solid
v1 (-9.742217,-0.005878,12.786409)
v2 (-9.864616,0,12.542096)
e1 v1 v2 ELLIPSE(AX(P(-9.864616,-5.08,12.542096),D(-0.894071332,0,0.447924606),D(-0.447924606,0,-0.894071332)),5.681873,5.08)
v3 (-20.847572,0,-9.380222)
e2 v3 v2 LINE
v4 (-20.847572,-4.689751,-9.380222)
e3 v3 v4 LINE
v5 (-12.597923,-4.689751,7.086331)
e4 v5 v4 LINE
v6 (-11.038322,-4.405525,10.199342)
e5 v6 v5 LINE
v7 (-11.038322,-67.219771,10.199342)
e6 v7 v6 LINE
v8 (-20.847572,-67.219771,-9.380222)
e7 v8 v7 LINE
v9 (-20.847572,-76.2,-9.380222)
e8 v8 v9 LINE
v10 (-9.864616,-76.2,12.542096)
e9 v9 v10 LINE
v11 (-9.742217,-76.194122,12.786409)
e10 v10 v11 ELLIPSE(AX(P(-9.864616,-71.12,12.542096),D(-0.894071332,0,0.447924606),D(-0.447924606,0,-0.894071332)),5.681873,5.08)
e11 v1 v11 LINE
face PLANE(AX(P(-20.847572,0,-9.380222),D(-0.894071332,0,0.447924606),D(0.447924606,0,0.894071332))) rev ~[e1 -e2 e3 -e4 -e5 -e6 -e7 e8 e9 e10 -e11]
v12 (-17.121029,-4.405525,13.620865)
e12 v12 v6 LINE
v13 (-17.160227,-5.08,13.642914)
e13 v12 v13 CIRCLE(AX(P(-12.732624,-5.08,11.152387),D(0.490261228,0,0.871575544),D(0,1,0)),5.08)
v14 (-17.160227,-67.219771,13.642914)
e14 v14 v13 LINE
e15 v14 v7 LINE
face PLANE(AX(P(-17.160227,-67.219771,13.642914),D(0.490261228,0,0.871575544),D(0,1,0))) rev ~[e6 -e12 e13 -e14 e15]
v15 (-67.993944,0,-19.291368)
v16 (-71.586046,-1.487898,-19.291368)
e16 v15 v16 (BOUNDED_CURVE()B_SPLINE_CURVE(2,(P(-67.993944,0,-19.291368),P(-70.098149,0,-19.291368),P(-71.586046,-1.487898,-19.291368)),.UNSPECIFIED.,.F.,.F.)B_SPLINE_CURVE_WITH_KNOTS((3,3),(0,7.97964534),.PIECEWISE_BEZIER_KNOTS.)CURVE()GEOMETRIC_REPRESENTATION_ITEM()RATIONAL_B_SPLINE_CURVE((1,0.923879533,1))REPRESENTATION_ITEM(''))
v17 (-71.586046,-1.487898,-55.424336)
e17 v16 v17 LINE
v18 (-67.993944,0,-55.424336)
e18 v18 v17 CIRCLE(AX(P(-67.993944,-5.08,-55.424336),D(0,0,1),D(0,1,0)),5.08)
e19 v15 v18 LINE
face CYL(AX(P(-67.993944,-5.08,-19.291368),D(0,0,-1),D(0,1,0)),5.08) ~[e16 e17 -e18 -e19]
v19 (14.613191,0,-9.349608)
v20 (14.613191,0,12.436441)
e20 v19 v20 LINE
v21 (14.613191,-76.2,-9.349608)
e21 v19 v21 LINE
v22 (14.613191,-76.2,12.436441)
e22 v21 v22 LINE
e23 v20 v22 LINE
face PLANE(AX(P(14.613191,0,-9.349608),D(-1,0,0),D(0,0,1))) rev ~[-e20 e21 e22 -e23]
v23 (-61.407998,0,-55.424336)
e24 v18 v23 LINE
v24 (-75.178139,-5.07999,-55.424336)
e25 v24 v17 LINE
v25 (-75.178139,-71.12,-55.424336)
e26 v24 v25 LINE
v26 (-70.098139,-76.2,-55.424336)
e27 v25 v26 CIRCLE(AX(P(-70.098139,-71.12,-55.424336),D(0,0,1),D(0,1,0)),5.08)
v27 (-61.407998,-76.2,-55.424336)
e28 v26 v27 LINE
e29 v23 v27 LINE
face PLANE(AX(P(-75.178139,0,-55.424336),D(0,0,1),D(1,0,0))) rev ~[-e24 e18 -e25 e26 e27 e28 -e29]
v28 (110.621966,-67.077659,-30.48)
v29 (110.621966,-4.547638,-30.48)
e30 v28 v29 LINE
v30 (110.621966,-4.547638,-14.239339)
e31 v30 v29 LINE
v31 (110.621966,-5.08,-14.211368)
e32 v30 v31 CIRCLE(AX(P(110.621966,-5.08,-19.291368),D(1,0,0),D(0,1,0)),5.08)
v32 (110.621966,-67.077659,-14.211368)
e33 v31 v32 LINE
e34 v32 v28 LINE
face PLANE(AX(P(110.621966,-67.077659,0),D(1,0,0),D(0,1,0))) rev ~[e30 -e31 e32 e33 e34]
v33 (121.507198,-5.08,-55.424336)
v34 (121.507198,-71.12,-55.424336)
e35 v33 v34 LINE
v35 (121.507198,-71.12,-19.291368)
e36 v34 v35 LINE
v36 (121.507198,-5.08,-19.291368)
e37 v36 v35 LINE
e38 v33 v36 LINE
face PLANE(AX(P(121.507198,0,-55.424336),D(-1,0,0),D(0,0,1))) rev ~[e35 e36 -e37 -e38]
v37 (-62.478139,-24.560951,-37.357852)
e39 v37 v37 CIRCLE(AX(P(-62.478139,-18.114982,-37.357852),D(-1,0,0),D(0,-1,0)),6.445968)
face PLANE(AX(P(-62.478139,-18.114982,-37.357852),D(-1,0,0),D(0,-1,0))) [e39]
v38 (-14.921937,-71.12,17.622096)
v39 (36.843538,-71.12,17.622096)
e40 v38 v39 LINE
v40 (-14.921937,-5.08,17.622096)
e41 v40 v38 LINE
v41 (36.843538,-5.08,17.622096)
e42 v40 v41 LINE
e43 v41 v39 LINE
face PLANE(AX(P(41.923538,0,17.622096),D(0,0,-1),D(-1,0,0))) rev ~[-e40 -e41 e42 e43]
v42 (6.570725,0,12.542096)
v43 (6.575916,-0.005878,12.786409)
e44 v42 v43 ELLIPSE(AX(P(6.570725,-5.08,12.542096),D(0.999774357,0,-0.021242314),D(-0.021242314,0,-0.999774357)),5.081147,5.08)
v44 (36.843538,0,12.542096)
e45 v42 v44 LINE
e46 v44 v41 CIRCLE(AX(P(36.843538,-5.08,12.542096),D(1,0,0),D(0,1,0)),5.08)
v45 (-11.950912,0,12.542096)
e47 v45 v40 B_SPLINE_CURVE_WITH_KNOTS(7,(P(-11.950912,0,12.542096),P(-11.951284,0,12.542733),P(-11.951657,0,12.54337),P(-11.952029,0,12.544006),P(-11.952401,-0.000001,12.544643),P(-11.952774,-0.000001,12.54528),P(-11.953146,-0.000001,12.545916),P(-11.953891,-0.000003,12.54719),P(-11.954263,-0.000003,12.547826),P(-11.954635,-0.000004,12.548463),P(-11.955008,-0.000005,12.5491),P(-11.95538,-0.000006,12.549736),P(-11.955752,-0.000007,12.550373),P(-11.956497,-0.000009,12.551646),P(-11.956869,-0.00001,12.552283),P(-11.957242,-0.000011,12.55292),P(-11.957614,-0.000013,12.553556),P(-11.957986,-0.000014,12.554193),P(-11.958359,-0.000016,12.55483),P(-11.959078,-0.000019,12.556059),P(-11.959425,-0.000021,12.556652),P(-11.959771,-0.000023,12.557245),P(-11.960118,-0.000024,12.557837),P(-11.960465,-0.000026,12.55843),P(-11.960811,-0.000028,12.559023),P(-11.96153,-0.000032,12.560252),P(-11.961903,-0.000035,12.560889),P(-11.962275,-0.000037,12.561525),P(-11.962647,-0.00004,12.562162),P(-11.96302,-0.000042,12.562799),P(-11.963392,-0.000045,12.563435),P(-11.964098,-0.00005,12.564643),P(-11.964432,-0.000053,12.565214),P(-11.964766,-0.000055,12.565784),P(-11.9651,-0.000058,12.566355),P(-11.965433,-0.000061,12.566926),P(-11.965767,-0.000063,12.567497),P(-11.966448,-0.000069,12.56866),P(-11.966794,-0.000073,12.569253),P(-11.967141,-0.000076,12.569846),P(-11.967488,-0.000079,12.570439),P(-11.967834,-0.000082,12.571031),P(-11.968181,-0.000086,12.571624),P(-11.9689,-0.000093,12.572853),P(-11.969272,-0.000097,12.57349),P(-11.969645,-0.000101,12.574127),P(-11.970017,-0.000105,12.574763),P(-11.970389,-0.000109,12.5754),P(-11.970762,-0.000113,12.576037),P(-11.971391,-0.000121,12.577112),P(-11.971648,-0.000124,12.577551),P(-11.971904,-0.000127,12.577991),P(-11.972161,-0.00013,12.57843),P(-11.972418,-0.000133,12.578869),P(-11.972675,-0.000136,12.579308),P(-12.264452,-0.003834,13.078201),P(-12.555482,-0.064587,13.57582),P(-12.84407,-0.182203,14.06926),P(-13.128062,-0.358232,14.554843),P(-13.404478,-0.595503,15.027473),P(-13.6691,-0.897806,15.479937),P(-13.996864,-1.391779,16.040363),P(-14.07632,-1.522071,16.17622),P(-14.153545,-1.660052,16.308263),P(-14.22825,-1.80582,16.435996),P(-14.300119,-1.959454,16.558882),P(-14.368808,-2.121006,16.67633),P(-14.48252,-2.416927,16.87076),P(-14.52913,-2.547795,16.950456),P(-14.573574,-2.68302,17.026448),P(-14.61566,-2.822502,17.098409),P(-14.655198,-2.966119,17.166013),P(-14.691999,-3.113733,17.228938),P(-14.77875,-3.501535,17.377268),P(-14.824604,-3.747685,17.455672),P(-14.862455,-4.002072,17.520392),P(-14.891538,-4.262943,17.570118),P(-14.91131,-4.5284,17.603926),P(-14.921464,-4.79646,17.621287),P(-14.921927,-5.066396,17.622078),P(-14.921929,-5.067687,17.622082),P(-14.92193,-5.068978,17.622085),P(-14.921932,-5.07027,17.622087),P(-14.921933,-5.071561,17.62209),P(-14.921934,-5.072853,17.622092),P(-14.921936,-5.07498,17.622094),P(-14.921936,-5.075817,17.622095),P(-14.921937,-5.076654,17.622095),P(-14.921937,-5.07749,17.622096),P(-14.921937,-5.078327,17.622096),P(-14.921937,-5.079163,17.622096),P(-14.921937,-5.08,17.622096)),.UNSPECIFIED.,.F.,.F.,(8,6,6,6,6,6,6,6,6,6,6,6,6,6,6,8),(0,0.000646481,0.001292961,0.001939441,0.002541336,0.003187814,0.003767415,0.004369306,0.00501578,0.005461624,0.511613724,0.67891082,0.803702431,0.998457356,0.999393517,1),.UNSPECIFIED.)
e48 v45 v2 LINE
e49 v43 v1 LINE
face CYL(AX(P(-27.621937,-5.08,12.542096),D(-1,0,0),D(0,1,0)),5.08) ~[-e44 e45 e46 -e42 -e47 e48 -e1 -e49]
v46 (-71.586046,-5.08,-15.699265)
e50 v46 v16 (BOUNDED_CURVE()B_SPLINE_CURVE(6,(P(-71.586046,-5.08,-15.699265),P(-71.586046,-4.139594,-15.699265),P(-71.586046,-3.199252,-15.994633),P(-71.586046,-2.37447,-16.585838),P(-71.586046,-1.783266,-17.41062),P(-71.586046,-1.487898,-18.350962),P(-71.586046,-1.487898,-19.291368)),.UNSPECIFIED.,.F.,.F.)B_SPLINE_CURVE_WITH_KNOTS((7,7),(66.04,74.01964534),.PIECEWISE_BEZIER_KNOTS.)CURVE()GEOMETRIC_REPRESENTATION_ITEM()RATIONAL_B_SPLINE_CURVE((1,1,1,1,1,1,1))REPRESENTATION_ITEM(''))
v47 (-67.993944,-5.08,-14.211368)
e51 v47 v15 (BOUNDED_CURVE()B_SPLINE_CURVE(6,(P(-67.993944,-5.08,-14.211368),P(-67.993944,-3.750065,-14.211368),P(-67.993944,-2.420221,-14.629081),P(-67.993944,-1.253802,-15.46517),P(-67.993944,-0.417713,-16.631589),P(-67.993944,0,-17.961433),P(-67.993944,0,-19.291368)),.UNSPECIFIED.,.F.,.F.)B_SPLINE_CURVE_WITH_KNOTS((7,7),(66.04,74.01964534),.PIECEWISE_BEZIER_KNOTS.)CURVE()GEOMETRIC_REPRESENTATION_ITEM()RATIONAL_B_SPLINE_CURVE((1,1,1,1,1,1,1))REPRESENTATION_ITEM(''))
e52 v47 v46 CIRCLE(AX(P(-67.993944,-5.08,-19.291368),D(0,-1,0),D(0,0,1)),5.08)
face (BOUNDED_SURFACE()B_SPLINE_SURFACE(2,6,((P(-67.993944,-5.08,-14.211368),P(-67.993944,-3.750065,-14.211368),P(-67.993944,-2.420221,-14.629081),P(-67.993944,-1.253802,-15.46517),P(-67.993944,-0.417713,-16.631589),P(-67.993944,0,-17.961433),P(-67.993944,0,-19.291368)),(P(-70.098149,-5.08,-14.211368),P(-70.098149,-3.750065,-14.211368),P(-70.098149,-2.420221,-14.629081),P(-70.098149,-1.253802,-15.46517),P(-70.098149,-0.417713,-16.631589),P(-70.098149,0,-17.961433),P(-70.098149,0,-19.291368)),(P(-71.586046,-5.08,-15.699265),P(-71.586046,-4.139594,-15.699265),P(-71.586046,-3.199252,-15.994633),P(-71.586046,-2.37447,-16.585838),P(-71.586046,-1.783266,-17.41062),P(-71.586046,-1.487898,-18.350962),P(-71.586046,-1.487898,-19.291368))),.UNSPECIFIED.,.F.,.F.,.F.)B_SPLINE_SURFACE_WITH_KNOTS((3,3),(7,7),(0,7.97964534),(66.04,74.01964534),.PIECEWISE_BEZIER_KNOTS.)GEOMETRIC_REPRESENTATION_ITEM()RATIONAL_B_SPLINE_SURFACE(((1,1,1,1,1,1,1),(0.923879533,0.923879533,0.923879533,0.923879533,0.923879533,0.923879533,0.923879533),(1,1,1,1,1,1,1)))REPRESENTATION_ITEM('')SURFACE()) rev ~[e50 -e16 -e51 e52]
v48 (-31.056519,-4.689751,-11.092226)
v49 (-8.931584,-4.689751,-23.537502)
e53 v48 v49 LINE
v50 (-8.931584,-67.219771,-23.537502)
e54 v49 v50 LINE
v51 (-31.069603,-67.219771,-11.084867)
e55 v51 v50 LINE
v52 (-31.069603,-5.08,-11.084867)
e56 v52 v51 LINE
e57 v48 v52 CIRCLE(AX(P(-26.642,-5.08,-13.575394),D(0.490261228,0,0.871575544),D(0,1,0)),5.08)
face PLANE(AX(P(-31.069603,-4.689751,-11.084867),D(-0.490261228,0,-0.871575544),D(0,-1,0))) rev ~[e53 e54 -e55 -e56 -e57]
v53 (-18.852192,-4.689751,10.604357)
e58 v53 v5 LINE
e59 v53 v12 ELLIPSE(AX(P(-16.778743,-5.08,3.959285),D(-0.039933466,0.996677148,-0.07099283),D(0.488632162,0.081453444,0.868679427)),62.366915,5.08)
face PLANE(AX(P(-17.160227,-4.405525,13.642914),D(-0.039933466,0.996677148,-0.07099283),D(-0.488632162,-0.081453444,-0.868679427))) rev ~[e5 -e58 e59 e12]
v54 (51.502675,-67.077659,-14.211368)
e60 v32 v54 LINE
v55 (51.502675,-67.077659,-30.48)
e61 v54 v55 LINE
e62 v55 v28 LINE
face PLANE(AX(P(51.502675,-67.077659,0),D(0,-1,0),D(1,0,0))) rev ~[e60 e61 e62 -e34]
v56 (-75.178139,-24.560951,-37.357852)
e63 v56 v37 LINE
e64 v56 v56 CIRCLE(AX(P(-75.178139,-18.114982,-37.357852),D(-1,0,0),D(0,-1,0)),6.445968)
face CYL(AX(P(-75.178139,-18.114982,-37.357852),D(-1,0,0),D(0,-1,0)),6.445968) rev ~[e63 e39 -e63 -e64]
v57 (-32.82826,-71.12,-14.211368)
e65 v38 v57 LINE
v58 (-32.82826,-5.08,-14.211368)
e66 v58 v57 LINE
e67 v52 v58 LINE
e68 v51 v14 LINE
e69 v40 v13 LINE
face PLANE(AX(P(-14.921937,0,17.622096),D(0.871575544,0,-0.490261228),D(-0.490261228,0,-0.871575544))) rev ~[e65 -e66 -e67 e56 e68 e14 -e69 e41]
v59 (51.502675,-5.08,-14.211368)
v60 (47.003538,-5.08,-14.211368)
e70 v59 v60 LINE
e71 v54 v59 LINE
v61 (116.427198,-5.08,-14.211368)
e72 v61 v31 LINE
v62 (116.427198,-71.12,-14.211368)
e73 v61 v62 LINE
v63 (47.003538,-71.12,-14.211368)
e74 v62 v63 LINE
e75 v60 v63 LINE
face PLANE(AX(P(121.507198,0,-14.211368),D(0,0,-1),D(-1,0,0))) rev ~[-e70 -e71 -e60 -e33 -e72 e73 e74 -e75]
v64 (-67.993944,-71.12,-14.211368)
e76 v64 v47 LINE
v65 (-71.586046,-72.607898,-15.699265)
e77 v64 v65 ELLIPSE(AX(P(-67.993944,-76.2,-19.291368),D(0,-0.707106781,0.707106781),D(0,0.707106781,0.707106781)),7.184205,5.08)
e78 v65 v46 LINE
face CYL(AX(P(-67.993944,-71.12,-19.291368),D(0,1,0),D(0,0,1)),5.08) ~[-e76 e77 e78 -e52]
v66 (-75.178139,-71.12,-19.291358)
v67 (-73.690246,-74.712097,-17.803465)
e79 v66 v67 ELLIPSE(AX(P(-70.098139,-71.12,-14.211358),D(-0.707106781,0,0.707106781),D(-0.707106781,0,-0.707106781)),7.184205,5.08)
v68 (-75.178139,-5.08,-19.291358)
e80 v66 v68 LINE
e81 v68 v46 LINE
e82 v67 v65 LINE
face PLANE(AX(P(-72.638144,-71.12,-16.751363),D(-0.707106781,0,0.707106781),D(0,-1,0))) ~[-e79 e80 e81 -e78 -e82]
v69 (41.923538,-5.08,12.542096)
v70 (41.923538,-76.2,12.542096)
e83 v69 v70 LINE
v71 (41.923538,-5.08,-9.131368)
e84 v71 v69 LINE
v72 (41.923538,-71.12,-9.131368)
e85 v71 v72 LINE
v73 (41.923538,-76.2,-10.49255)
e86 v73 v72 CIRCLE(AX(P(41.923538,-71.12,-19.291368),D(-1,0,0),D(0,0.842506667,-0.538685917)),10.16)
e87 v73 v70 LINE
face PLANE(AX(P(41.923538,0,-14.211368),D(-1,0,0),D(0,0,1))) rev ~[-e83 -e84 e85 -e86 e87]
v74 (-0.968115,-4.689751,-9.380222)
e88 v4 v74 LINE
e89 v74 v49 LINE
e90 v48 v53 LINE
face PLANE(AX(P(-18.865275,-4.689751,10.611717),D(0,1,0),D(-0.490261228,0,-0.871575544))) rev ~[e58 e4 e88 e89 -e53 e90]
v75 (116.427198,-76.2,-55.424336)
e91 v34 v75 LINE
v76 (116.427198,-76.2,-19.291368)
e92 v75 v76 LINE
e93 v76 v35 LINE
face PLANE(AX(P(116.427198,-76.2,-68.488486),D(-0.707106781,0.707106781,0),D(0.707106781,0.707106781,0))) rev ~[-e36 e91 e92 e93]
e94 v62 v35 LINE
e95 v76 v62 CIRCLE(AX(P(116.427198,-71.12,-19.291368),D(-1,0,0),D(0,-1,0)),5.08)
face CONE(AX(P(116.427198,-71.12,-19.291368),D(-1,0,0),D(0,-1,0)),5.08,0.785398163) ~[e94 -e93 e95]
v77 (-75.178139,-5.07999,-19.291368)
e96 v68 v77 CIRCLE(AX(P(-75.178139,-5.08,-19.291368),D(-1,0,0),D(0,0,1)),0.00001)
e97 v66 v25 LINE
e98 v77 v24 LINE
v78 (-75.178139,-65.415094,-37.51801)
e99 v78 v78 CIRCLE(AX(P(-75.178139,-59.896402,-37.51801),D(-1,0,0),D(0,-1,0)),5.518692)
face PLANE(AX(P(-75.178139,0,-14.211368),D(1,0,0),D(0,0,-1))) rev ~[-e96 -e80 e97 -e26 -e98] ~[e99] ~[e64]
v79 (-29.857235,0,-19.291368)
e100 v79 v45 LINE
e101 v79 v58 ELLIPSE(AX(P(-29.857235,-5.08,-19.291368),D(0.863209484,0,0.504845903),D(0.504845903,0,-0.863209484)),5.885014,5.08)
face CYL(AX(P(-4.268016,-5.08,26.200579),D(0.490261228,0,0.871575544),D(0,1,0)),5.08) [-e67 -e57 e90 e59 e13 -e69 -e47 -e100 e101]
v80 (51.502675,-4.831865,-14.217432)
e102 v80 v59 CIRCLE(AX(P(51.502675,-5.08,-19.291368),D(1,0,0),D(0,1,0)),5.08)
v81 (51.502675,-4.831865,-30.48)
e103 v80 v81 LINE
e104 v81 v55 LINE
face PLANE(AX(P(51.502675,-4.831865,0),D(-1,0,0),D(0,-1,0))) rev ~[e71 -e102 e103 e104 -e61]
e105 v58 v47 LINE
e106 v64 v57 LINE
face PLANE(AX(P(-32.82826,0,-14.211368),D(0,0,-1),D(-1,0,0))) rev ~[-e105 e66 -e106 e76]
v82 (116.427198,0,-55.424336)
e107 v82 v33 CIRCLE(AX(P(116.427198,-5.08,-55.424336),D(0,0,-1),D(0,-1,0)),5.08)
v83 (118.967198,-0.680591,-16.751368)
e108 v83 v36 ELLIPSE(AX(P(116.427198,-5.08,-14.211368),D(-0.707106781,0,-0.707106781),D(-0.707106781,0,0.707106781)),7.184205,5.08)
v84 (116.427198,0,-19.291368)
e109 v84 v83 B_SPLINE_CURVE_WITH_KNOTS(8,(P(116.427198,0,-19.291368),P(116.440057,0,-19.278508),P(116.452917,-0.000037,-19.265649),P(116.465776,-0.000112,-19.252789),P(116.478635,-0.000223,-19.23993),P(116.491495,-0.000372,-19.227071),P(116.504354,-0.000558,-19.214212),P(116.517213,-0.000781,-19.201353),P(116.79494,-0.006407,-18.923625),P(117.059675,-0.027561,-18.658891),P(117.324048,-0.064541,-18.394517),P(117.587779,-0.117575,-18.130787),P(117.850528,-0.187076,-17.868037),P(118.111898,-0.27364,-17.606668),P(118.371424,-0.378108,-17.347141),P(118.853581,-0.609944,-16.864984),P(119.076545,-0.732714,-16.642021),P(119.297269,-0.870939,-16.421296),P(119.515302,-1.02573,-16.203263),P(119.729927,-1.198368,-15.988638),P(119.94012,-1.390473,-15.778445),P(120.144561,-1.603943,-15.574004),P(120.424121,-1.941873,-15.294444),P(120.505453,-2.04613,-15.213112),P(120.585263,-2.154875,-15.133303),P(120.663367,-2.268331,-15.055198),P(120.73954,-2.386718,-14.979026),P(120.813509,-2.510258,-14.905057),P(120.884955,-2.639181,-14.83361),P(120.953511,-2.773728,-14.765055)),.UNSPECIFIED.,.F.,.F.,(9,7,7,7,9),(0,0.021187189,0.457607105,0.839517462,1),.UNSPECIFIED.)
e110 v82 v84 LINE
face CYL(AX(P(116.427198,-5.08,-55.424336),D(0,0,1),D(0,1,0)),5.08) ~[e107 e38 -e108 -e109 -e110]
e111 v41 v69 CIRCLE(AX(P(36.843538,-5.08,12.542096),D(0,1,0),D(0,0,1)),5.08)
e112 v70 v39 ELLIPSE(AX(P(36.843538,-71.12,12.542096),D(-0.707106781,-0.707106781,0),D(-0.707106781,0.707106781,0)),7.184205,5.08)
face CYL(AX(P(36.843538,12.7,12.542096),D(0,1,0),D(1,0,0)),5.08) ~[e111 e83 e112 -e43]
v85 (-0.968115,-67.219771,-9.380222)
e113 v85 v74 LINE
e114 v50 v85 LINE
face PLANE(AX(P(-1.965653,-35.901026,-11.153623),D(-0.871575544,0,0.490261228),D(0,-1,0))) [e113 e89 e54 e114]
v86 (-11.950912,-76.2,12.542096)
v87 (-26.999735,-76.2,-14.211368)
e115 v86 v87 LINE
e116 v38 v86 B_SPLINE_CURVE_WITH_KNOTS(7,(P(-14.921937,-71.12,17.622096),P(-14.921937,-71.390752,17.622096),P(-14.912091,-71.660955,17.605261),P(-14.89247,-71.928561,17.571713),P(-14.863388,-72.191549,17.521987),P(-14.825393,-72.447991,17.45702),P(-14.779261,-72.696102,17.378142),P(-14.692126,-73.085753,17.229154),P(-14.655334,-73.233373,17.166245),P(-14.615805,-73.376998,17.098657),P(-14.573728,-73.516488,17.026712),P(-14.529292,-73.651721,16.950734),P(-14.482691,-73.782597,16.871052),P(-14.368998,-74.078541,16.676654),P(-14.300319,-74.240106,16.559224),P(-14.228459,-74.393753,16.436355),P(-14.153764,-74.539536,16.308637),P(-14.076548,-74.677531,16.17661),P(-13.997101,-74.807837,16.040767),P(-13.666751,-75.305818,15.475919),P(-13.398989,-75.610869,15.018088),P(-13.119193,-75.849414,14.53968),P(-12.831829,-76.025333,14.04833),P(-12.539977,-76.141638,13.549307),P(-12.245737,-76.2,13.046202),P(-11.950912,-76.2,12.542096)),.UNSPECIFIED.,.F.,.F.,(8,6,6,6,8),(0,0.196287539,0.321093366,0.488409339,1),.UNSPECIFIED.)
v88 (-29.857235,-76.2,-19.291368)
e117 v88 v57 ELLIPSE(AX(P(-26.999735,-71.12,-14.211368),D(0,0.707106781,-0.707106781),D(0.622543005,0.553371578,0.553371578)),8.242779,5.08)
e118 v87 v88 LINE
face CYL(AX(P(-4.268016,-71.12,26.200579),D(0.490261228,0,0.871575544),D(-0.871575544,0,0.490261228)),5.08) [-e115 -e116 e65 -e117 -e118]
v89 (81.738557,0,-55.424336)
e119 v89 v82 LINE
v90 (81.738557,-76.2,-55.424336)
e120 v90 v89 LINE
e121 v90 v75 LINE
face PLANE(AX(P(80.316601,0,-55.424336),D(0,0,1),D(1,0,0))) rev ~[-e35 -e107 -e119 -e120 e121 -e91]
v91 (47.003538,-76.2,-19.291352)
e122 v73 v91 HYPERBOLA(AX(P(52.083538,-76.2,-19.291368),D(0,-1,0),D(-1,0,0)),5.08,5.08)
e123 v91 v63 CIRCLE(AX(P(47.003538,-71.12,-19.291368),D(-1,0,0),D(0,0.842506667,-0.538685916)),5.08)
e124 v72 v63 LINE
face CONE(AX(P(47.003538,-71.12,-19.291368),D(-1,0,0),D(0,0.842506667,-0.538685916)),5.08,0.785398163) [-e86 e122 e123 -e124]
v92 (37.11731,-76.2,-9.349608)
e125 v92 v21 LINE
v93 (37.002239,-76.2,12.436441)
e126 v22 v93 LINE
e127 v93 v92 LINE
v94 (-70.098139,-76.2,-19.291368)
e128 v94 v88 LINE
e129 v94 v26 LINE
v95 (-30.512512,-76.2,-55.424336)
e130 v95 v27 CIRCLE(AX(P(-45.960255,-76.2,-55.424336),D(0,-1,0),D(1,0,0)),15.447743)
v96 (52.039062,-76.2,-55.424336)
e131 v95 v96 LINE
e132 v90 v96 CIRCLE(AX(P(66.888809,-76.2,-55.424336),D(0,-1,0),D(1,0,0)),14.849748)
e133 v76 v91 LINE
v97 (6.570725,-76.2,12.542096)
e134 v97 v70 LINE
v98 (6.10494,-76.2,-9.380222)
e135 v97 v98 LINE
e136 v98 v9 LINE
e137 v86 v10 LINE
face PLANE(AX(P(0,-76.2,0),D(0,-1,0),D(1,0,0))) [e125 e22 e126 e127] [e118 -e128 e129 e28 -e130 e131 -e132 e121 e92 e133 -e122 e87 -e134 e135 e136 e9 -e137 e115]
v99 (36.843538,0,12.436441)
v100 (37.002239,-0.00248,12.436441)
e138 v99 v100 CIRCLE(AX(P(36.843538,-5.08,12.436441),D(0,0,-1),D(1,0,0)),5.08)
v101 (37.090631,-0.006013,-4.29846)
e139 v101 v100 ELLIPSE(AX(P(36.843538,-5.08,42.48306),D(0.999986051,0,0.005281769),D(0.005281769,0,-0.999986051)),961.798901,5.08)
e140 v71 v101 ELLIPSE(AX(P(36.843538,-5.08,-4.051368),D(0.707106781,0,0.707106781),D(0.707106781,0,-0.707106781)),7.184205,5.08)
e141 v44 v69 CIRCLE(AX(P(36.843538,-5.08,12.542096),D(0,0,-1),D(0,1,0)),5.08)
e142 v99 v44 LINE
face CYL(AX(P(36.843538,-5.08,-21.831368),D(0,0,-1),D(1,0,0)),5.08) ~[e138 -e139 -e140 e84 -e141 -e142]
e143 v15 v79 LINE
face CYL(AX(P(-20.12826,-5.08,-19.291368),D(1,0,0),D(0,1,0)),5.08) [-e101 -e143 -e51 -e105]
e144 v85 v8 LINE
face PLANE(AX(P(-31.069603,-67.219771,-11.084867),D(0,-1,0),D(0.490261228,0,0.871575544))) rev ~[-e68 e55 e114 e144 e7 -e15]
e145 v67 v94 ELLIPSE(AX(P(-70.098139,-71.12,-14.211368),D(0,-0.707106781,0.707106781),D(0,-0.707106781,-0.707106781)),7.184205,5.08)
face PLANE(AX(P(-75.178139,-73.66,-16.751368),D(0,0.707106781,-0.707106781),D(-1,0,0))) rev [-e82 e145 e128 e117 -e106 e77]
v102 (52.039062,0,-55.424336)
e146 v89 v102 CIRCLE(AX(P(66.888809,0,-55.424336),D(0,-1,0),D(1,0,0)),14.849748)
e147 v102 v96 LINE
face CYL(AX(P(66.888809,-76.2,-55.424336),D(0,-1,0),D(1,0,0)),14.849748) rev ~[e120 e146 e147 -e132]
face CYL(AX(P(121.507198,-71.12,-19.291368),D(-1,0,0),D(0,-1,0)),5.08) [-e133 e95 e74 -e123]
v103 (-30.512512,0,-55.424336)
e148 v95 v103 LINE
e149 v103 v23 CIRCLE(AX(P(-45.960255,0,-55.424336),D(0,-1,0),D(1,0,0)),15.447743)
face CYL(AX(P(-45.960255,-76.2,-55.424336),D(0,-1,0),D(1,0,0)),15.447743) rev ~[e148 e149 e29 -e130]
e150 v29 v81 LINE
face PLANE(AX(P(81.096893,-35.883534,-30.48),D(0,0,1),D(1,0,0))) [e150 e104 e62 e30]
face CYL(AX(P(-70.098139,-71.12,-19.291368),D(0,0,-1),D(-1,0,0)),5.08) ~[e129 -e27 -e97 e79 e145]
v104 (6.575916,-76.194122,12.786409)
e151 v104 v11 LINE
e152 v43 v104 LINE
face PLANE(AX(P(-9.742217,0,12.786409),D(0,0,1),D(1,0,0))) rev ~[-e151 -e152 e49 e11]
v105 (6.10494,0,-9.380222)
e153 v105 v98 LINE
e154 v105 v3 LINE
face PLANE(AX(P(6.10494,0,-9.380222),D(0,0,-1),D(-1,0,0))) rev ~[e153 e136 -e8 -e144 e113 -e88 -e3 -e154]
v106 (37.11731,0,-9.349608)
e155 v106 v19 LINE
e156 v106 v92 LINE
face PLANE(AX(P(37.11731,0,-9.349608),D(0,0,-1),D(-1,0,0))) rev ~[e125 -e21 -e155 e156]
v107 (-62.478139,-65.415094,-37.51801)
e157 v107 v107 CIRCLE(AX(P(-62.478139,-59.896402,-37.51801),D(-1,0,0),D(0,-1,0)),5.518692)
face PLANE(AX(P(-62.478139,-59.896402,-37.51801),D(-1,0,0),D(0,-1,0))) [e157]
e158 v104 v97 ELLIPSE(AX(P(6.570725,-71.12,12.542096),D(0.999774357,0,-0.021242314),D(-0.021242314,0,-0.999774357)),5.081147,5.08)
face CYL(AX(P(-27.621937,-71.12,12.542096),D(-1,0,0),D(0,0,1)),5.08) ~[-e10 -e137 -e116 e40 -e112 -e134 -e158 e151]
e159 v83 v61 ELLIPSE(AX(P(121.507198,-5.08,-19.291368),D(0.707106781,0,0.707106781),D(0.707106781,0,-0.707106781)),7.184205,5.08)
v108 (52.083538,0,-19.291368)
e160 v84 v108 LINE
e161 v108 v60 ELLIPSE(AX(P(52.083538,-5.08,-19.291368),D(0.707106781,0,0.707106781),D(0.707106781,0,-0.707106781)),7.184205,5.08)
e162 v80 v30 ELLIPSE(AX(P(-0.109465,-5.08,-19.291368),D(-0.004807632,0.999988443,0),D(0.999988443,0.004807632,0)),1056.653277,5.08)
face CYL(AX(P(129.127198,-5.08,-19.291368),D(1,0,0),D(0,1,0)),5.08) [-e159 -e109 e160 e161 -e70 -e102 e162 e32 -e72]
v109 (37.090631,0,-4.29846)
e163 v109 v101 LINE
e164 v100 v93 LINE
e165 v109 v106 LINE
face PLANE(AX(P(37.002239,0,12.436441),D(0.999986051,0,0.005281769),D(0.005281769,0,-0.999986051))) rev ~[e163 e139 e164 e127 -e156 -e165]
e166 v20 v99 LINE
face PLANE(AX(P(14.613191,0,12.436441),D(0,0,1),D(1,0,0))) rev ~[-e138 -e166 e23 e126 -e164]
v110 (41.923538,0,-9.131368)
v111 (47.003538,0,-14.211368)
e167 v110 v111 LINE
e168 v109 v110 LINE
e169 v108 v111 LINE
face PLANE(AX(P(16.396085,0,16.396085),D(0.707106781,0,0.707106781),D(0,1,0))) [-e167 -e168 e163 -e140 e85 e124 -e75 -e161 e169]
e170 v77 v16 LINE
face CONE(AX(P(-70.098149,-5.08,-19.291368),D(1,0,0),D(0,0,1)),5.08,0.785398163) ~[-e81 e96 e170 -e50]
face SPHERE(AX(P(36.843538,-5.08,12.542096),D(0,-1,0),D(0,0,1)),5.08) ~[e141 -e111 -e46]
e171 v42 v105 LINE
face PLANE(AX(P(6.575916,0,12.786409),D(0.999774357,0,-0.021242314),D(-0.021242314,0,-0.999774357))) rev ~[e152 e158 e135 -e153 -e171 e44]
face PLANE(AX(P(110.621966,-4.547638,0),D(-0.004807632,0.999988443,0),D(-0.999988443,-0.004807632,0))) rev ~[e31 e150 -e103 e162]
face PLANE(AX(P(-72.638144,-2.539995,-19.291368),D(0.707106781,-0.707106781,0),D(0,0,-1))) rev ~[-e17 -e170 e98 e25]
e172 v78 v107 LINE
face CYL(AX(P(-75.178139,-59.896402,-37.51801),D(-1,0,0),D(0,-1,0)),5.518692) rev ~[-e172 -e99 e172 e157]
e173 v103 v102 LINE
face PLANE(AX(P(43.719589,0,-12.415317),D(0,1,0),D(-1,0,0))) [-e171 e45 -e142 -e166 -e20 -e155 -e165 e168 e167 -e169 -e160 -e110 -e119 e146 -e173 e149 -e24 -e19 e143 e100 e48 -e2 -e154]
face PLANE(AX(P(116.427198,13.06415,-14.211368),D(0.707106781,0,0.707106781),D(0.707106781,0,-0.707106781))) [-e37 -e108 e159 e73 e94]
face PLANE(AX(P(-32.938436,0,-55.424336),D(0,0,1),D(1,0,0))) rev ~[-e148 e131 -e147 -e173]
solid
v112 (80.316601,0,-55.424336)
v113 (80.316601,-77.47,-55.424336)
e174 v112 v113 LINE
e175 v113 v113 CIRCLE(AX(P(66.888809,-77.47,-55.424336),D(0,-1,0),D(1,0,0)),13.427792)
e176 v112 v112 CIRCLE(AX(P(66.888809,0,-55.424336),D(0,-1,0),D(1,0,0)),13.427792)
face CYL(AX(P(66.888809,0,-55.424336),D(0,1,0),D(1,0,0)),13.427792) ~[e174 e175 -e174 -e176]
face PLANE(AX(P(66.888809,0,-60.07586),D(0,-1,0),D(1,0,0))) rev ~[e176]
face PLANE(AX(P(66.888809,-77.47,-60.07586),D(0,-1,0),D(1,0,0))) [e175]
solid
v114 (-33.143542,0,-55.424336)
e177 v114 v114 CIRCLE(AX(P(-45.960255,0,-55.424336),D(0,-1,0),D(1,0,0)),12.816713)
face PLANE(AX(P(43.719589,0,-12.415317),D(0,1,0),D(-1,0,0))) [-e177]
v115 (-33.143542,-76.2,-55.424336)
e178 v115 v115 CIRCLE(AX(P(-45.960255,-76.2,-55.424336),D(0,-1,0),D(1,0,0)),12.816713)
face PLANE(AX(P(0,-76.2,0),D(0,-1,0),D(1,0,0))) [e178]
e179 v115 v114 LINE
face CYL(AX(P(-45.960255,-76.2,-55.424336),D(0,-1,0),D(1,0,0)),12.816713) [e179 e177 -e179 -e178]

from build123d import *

# Parameters (mm, degrees)
F1_DEPTH      = 76.2
F2_T1_DEPTH   = 82.2454749882
F2_T3_DEPTH   = 101.6
F2_T8_DEPTH   = 61.9240448763
F3_SIZE       = 5.08
F4_R          = 5.08
F5_R          = 5.08
F6_T1_DEPTH   = 71.12
F6_T6_ANGLE   = 237.4057717794
F6_T8_DEPTH   = 49.1971181071
F6_T10_DEPTH  = 84.1841495789
F6_T13_ANGLE  = 90
F8_DEPTH      = 30.48
F10_DEPTH     = 25.4
F12_R         = 15.4477433976
F12_R_2       = 12.8167131571
F13_DEPTH     = 76.2
F14_R         = 14.8497475739
F15_DEPTH     = 76.2
F16_DEPTH     = 76.2
F17_DEPTH     = 77.47
F18_T1_DEPTH  = 64.4654749882
F18_T6_DEPTH  = 61.9240448763
F18_T11_DEPTH = 67.7498786986
F18_T14_ANGLE = 90.0000000017
F18_T18_DEPTH = 34.3734642797
F18_T24_DEPTH = 67.7498786986
F18_T28_DEPTH = 61.9240448763
F19_SIZE      = 5.07999
F20_T4_DEPTH  = 94.8236597681
F21_R         = 5.08
F22_R         = 5.08
F23_R         = 6.4459683432
F24_DEPTH     = 12.7
F25_R         = 5.5186924219
F26_DEPTH     = 12.7


# Not quite as in the source:
# - a fillet or chamfer that OpenCascade refuses, or shapes differently, is made with other operations: its cross-section is extruded or revolved along the edge and cut away or added
# - a fillet or chamfer is up to 0.001 mm smaller than in the source, because OpenCascade refuses the exact size
# - a feature names something its author has since deleted; it is built from what else it names
# - the program builds the solid bodies; features that only make, move or delete a surface that nothing else refers to are left out


with BuildPart() as f1:
    # F0 (on Front) → F1 (new body)
    with BuildSketch(Plane.XZ):
        with BuildLine():
            Line((-66.651314497, -14.2113678157), (-75.1781389117, -14.2113678157))
            Line((-75.1781389117, -14.2113678157), (-75.1781389117, -55.424336344))
            Line((-75.1781389117, -55.424336344), (-58.9820734658, -55.424336344))
            ThreePointArc((-58.9820734658, -55.424336344), (-45.9602549672, -42.4025178455), (-32.9384364687, -55.424336344))
            Line((-32.9384364687, -55.424336344), (53.461017087, -55.424336344))
            ThreePointArc((53.461017087, -55.424336344), (66.8888092041, -41.9965442269), (80.3166013212, -55.424336344))
            Line((80.3166013212, -55.424336344), (121.5071976185, -55.424336344))
            Line((121.5071976185, -55.424336344), (121.5071976185, -37.5180095434))
            Line((121.5071976185, -37.5180095434), (121.5071976185, -14.2113678157))
            Line((121.5071976185, -14.2113678157), (41.9235378504, -14.2113678157))
            Line((41.9235378504, -14.2113678157), (-32.8282602131, -14.2113678157))
            Line((-32.8282602131, -14.2113678157), (-66.651314497, -14.2113678157))
        make_face()
        Polygon((-14.9219371378, 17.622096464), (-32.8282602131, -14.2113678157), (41.9235378504, -14.2113678157), (41.9235378504, 17.622096464), align=None)
        Polygon((-20.8475716081, -9.3802222982), (-9.7422166161, 12.7864088863), (6.5759164281, 12.7864088863), (6.1049396172, -9.3802222982), align=None, mode=Mode.SUBTRACT)
        Polygon((14.6131906658, -9.3496078625), (14.6131906658, 12.4364411458), (37.0022393763, 12.4364411458), (37.1173098683, -9.3496078625), align=None, mode=Mode.SUBTRACT)
        with BuildLine():
            ThreePointArc((-32.9384364687, -55.424336344), (-45.9602549672, -42.4025178455), (-58.9820734658, -55.424336344))
            Line((-58.9820734658, -55.424336344), (-32.9384364687, -55.424336344))
        make_face()
        with BuildLine():
            Line((-32.9384364687, -55.424336344), (-58.9820734658, -55.424336344))
            ThreePointArc((-58.9820734658, -55.424336344), (-45.9602549672, -68.4461548426), (-32.9384364687, -55.424336344))
        make_face()
        with BuildLine():
            ThreePointArc((80.3166013212, -55.424336344), (66.8888092041, -41.9965442269), (53.461017087, -55.424336344))
            Line((53.461017087, -55.424336344), (80.3166013212, -55.424336344))
        make_face()
        with BuildLine():
            Line((80.3166013212, -55.424336344), (53.461017087, -55.424336344))
            ThreePointArc((53.461017087, -55.424336344), (66.8888092041, -68.8521284611), (80.3166013212, -55.424336344))
        make_face()
    extrude(amount=F1_DEPTH)

    # F2: fillet of radius 5.08 on 3 edges, made by hand

    # F2_s2 → F2_t1 (cut)
    with BuildSketch(Plane.YZ.offset(-27.6219371378)):
        with BuildLine():
            ThreePointArc((-71.12, 17.622096464), (-74.7121024484, 16.1341989125), (-76.2, 12.542096464))
            Line((-76.2, 12.542096464), (-76.2, 17.622096464))
            Line((-76.2, 17.622096464), (-71.12, 17.622096464))
        make_face()
    extrude(amount=F2_T1_DEPTH, mode=Mode.SUBTRACT)

    # F2_s4 → F2_t3 (cut)
    with BuildSketch(Plane.XZ.offset(-12.7)):
        with BuildLine():
            ThreePointArc((41.9235378504, 12.542096464), (40.4356402988, 16.1341989125), (36.8435378504, 17.622096464))
            Line((36.8435378504, 17.622096464), (41.9235378504, 17.622096464))
            Line((41.9235378504, 17.622096464), (41.9235378504, 12.542096464))
        make_face()
    extrude(amount=F2_T3_DEPTH, mode=Mode.SUBTRACT)


with BuildPart() as f2_tool6:
    # F2_s7 → F2_t8 (new body)
    with BuildSketch(Plane(origin=(10.1696558671, 0, 18.0793887958), x_dir=(0, 1, 0), z_dir=(-0.4902612275, 0, -0.8715755439))):
        with BuildLine():
            ThreePointArc((-71.12, -21.6450261215), (-74.7121024484, -20.1571285699), (-76.2, -16.5650261215))
            Line((-76.2, -16.5650261215), (-76.2, -21.6450261215))
            Line((-76.2, -21.6450261215), (-71.12, -21.6450261215))
        make_face()
    extrude(amount=F2_T8_DEPTH)

    split(bisect_by=Plane.XY.offset(-14.2113678157), keep=Keep.TOP)


with BuildPart() as f1_1:
    add(f1.part)

    # F2_t5: cut F2_tool6
    add(f2_tool6.part, mode=Mode.SUBTRACT)

    # F3
    f3_edges = [f1_1.edges().sort_by_distance(p)[0] for p in [
        (-51.088937, -76.2, -14.211368),
    ]]
    chamfer(f3_edges, length=F3_SIZE)

    # F4
    f4_edges = [f1_1.edges().sort_by_distance(p)[0] for p in [
        (-75.178139, -76.2, -37.357852),
    ]]
    fillet(f4_edges, radius=F4_R)

    # F5
    f5_edges = [f1_1.edges().sort_by_distance(p)[0] for p in [
        (81.715368, -76.2, -14.211368),
    ]]
    fillet(f5_edges, radius=F5_R)

    # F6: chamfer of 5.08 on 4 edges, made by hand

    # F6_s2 → F6_t1 (join)
    with BuildSketch(Plane.XZ):
        Polygon((41.9235378504, -9.1313678157), (47.0035378504, -14.2113678157), (41.9235378504, -14.2113678157), align=None)
    extrude(amount=F6_T1_DEPTH)


with BuildPart() as f6_tool4:
    # F6_s5 → F6_t6 (revolve)
    with BuildSketch(Plane(origin=(0, -29.3930998832, -45.970911519), x_dir=(1, 0, 0), z_dir=(0, 0.5386859165, 0.8425066666))):
        Polygon((47.0035378504, -44.447085979), (41.9235378504, -39.367085979), (41.9235378504, -44.447085979), align=None)
    revolve(axis=Axis((41.9235378504, -71.12, -19.2913678157), (-1, 0, 0)), revolution_arc=F6_T6_ANGLE)

    split(bisect_by=Plane.XZ.offset(76.2), keep=Keep.BOTTOM)


with BuildPart() as f1_2:
    add(f1_1.part)

    # F6_t3: union F6_tool4
    add(f6_tool4.part)

    # F6_s9 → F6_t8 (cut)
    with BuildSketch(Plane.XY.offset(-68.4884859229)):
        Polygon((116.4271976185, -76.2), (121.5071976185, -71.12), (121.5071976185, -76.2), align=None)
    extrude(amount=F6_T8_DEPTH, mode=Mode.SUBTRACT)

    # F6_s11 → F6_t10 (cut)
    with BuildSketch(Plane.XZ.offset(-13.0641495789)):
        Polygon((116.4271976185, -14.2113678157), (121.5071976185, -19.2913678157), (121.5071976185, -14.2113678157), align=None)
    extrude(amount=F6_T10_DEPTH, mode=Mode.SUBTRACT)

    # F6_s12 → F6_t13 (revolve, cut)
    with BuildSketch(Plane.XY.offset(-19.2913678157)):
        Polygon((116.4271976185, -76.2), (121.5071976185, -71.12), (121.5071976185, -76.2), align=None)
    revolve(axis=Axis((121.5071976185, -71.12, -19.2913678157), (-1, 0, 0)), revolution_arc=F6_T13_ANGLE, mode=Mode.SUBTRACT)

    # F7 (on Top) → F8 (cut)
    with BuildSketch(Plane.XY):
        Polygon((110.6219664216, -4.5476378873), (51.502674818, -4.8318649642), (51.502674818, -67.0776590705), (110.6219664216, -67.0776590705), align=None)
    extrude(amount=-F8_DEPTH, mode=Mode.SUBTRACT)

    # F9 (on face) → F10 (cut)
    with BuildSketch(Plane(origin=(-18.8652754153, 0, 10.6117170762), x_dir=(0, -1, 0), z_dir=(-0.8715755439, 0, 0.4902612275))):
        Polygon((4.4055245817, 3.4778357949), (4.6897507273, 0), (4.6897507273, -24.8935203999), (67.2197714448, -24.8935203999), (67.2197714448, 3.4778357949), align=None)
    extrude(amount=-F10_DEPTH, mode=Mode.SUBTRACT)

    # F12 (on face) → F13 (cut)
    with BuildSketch(Plane.XZ.offset(76.2)):
        with Locations((-45.9602549672, -55.424336344)):
            Circle(F12_R)
        with Locations((-45.9602549672, -55.424336344)):
            Circle(F12_R_2, mode=Mode.SUBTRACT)
    extrude(amount=-F13_DEPTH, mode=Mode.SUBTRACT)

    # F14 (on face) → F15 (cut)
    with BuildSketch(Plane.XZ.offset(76.2)):
        with Locations((66.8888092041, -55.424336344)):
            Circle(F14_R)
    extrude(amount=-F15_DEPTH, mode=Mode.SUBTRACT)

    # F14 (on face) → F16 (cut)
    with BuildSketch(Plane.XZ.offset(76.2)):
        with Locations((66.8888092041, -55.424336344)):
            Circle(F14_R)
    extrude(amount=-F16_DEPTH, mode=Mode.SUBTRACT)

    # F18: fillet of radius 5.08 on 3 edges, made by hand

    # F18_s2 → F18_t1 (cut)
    with BuildSketch(Plane.YZ.offset(-27.6219371378)):
        with BuildLine():
            ThreePointArc((0, 12.542096464), (-1.4878975516, 16.1341989125), (-5.08, 17.622096464))
            Line((-5.08, 17.622096464), (0, 17.622096464))
            Line((0, 17.622096464), (0, 12.542096464))
        make_face()
    extrude(amount=F18_T1_DEPTH, mode=Mode.SUBTRACT)


with BuildPart() as f17:
    # F0 (on Front) → F17 (new body)
    with BuildSketch(Plane.XZ):
        with BuildLine():
            Line((80.3166013212, -55.424336344), (53.461017087, -55.424336344))
            ThreePointArc((53.461017087, -55.424336344), (66.8888092041, -68.8521284611), (80.3166013212, -55.424336344))
        make_face()
        with BuildLine():
            ThreePointArc((80.3166013212, -55.424336344), (66.8888092041, -41.9965442269), (53.461017087, -55.424336344))
            Line((53.461017087, -55.424336344), (80.3166013212, -55.424336344))
        make_face()
    extrude(amount=F17_DEPTH)


with BuildPart() as f18_tool4:
    # F18_s5 → F18_t6 (new body)
    with BuildSketch(Plane(origin=(10.1696558671, 0, 18.0793887958), x_dir=(0, 1, 0), z_dir=(-0.4902612275, 0, -0.8715755439))):
        with BuildLine():
            ThreePointArc((0, -16.5650261215), (-1.4878975516, -20.1571285699), (-5.08, -21.6450261215))
            Line((-5.08, -21.6450261215), (0, -21.6450261215))
            Line((0, -21.6450261215), (0, -16.5650261215))
        make_face()
    extrude(amount=F18_T6_DEPTH)

    split(bisect_by=Plane.XY.offset(-14.2113678157), keep=Keep.TOP)


with BuildPart() as f1_3:
    add(f1_2.part)

    # F18_t3: cut F18_tool4
    add(f18_tool4.part, mode=Mode.SUBTRACT)


with BuildPart() as f18_tool9:
    # F18_s10 → F18_t11 (new body)
    with BuildSketch(Plane.YZ.offset(-20.1282602131)):
        with BuildLine():
            ThreePointArc((0, -19.2913678157), (-1.4878975516, -15.6992653673), (-5.08, -14.2113678157))
            Line((-5.08, -14.2113678157), (0, -14.2113678157))
            Line((0, -14.2113678157), (0, -19.2913678157))
        make_face()
    extrude(amount=-F18_T11_DEPTH)

    split(bisect_by=Plane(origin=(-18.8652754153, 0, 10.6117170762), x_dir=(0, 1, 0), z_dir=(-0.8715755439, 0, 0.4902612275)), keep=Keep.TOP)


with BuildPart() as f1_4:
    add(f1_3.part)

    # F18_t8: cut F18_tool9
    add(f18_tool9.part, mode=Mode.SUBTRACT)

    # F18_s13 → F18_t14 (revolve, cut)
    with BuildSketch(Plane.YZ.offset(36.8435378505)):
        with BuildLine():
            ThreePointArc((0, 12.542096464), (-1.4878975516, 16.1341989124), (-5.08, 17.622096464))
            Line((-5.08, 17.622096464), (0, 17.622096464))
            Line((0, 17.622096464), (0, 12.542096464))
        make_face()
    revolve(axis=Axis((36.8435378505, 0, 12.5420964641), (0, 1, 0)), revolution_arc=F18_T14_ANGLE, mode=Mode.SUBTRACT)


with BuildPart() as f18_tool16:
    # F18_s17 → F18_t18 (new body)
    with BuildSketch(Plane.XY.offset(-21.8313678157)):
        with BuildLine():
            ThreePointArc((41.9235378504, -5.08), (40.4356402988, -1.4878975516), (36.8435378504, 0))
            Line((36.8435378504, 0), (41.9235378504, 0))
            Line((41.9235378504, 0), (41.9235378504, -5.08))
        make_face()
    extrude(amount=F18_T18_DEPTH)

    split(bisect_by=Plane(origin=(16.3960850174, 0, 16.3960850174), x_dir=(0, 1, 0), z_dir=(0.7071067812, 0, 0.7071067812)), keep=Keep.TOP)


with BuildPart() as f1_5:
    add(f1_4.part)

    # F18_t15: cut F18_tool16
    add(f18_tool16.part, mode=Mode.SUBTRACT)


with BuildPart() as f18_tool22:
    # F18_s23 → F18_t24 (new body)
    with BuildSketch(Plane.YZ.offset(-20.1282602131)):
        with BuildLine():
            ThreePointArc((0, -19.2913678157), (-1.4878975516, -15.6992653673), (-5.08, -14.2113678157))
            Line((-5.08, -14.2113678157), (0, -14.2113678157))
            Line((0, -14.2113678157), (0, -19.2913678157))
        make_face()
    extrude(amount=-F18_T24_DEPTH)

    split(bisect_by=Plane(origin=(-18.8652754153, 0, 10.6117170762), x_dir=(0, 1, 0), z_dir=(0.8715755439, 0, -0.4902612275)), keep=Keep.TOP)


with BuildPart() as f18_tool26:
    # F18_s27 → F18_t28 (new body)
    with BuildSketch(Plane(origin=(10.1696558671, 0, 18.0793887958), x_dir=(0, 1, 0), z_dir=(-0.4902612275, 0, -0.8715755439))):
        with BuildLine():
            ThreePointArc((0, -16.5650261215), (-1.4878975516, -20.1571285699), (-5.08, -21.6450261215))
            Line((-5.08, -21.6450261215), (0, -21.6450261215))
            Line((0, -21.6450261215), (0, -16.5650261215))
        make_face()
    extrude(amount=F18_T28_DEPTH)

    split(bisect_by=Plane.XY.offset(-14.2113678157), keep=Keep.BOTTOM)


with BuildPart() as f18_tool22_1:
    add(f18_tool22.part)

    # F18_t30: intersect F18_tool26
    add(f18_tool26.part, mode=Mode.INTERSECT)


with BuildPart() as f1_6:
    add(f1_5.part)

    # F18_t20: cut F18_tool22
    add(f18_tool22_1.part, mode=Mode.SUBTRACT)

    # F19 (size 5.08 in the source; OpenCascade refuses exactly that, so slightly less here)
    f19_edges = [f1_6.edges().sort_by_distance(p)[0] for p in [
        (-75.178139, 0, -37.357852),
    ]]
    chamfer(f19_edges, length=F19_SIZE)

    # F20: fillet of radius 5.08 on 2 edges, made by hand


with BuildPart() as f20_tool2:
    # F20_s3 → F20_t4 (new body)
    with BuildSketch(Plane.YZ.offset(129.1271976185)):
        with BuildLine():
            ThreePointArc((0, -19.2913678157), (-1.4878975516, -15.6992653673), (-5.08, -14.2113678157))
            Line((-5.08, -14.2113678157), (0, -14.2113678157))
            Line((0, -14.2113678157), (0, -19.2913678157))
        make_face()
    extrude(amount=-F20_T4_DEPTH)

    split(bisect_by=Plane(origin=(16.3960850173, 0, 16.3960850173), x_dir=(0, 1, 0), z_dir=(0.7071067812, 0, 0.7071067812)), keep=Keep.TOP)


with BuildPart() as f1_7:
    add(f1_6.part)

    # F20_t1: cut F20_tool2
    add(f20_tool2.part, mode=Mode.SUBTRACT)

    # F21
    f21_edges = [f1_7.edges().sort_by_distance(p)[0] for p in [
        (121.507198, 0, -37.357852),
    ]]
    fillet(f21_edges, radius=F21_R)

    # F22
    f22_edges = [f1_7.edges().sort_by_distance(p)[0] for p in [
        (-70.098149, 0, -37.357852),
        (-70.098149, -1.487898, -15.699265),
        (-70.098149, -38.1, -14.211368),
    ]]
    fillet(f22_edges, radius=F22_R)

    # F23 (on face) → F24 (cut)
    with BuildSketch(Plane(origin=(-75.1781389117, 0, 0), x_dir=(0, -1, 0), z_dir=(-1, 0, 0))):
        with Locations((18.1149821728, -37.3578520799)):
            Circle(F23_R)
    extrude(amount=-F24_DEPTH, mode=Mode.SUBTRACT)

    # F25 (on face) → F26 (cut)
    with BuildSketch(Plane(origin=(-75.1781389117, 0, 0), x_dir=(0, -1, 0), z_dir=(-1, 0, 0))):
        with Locations((59.896402061, -37.5180095434)):
            Circle(F25_R)
    extrude(amount=-F26_DEPTH, mode=Mode.SUBTRACT)


solid = Compound([f17.part, f1_7.part])
